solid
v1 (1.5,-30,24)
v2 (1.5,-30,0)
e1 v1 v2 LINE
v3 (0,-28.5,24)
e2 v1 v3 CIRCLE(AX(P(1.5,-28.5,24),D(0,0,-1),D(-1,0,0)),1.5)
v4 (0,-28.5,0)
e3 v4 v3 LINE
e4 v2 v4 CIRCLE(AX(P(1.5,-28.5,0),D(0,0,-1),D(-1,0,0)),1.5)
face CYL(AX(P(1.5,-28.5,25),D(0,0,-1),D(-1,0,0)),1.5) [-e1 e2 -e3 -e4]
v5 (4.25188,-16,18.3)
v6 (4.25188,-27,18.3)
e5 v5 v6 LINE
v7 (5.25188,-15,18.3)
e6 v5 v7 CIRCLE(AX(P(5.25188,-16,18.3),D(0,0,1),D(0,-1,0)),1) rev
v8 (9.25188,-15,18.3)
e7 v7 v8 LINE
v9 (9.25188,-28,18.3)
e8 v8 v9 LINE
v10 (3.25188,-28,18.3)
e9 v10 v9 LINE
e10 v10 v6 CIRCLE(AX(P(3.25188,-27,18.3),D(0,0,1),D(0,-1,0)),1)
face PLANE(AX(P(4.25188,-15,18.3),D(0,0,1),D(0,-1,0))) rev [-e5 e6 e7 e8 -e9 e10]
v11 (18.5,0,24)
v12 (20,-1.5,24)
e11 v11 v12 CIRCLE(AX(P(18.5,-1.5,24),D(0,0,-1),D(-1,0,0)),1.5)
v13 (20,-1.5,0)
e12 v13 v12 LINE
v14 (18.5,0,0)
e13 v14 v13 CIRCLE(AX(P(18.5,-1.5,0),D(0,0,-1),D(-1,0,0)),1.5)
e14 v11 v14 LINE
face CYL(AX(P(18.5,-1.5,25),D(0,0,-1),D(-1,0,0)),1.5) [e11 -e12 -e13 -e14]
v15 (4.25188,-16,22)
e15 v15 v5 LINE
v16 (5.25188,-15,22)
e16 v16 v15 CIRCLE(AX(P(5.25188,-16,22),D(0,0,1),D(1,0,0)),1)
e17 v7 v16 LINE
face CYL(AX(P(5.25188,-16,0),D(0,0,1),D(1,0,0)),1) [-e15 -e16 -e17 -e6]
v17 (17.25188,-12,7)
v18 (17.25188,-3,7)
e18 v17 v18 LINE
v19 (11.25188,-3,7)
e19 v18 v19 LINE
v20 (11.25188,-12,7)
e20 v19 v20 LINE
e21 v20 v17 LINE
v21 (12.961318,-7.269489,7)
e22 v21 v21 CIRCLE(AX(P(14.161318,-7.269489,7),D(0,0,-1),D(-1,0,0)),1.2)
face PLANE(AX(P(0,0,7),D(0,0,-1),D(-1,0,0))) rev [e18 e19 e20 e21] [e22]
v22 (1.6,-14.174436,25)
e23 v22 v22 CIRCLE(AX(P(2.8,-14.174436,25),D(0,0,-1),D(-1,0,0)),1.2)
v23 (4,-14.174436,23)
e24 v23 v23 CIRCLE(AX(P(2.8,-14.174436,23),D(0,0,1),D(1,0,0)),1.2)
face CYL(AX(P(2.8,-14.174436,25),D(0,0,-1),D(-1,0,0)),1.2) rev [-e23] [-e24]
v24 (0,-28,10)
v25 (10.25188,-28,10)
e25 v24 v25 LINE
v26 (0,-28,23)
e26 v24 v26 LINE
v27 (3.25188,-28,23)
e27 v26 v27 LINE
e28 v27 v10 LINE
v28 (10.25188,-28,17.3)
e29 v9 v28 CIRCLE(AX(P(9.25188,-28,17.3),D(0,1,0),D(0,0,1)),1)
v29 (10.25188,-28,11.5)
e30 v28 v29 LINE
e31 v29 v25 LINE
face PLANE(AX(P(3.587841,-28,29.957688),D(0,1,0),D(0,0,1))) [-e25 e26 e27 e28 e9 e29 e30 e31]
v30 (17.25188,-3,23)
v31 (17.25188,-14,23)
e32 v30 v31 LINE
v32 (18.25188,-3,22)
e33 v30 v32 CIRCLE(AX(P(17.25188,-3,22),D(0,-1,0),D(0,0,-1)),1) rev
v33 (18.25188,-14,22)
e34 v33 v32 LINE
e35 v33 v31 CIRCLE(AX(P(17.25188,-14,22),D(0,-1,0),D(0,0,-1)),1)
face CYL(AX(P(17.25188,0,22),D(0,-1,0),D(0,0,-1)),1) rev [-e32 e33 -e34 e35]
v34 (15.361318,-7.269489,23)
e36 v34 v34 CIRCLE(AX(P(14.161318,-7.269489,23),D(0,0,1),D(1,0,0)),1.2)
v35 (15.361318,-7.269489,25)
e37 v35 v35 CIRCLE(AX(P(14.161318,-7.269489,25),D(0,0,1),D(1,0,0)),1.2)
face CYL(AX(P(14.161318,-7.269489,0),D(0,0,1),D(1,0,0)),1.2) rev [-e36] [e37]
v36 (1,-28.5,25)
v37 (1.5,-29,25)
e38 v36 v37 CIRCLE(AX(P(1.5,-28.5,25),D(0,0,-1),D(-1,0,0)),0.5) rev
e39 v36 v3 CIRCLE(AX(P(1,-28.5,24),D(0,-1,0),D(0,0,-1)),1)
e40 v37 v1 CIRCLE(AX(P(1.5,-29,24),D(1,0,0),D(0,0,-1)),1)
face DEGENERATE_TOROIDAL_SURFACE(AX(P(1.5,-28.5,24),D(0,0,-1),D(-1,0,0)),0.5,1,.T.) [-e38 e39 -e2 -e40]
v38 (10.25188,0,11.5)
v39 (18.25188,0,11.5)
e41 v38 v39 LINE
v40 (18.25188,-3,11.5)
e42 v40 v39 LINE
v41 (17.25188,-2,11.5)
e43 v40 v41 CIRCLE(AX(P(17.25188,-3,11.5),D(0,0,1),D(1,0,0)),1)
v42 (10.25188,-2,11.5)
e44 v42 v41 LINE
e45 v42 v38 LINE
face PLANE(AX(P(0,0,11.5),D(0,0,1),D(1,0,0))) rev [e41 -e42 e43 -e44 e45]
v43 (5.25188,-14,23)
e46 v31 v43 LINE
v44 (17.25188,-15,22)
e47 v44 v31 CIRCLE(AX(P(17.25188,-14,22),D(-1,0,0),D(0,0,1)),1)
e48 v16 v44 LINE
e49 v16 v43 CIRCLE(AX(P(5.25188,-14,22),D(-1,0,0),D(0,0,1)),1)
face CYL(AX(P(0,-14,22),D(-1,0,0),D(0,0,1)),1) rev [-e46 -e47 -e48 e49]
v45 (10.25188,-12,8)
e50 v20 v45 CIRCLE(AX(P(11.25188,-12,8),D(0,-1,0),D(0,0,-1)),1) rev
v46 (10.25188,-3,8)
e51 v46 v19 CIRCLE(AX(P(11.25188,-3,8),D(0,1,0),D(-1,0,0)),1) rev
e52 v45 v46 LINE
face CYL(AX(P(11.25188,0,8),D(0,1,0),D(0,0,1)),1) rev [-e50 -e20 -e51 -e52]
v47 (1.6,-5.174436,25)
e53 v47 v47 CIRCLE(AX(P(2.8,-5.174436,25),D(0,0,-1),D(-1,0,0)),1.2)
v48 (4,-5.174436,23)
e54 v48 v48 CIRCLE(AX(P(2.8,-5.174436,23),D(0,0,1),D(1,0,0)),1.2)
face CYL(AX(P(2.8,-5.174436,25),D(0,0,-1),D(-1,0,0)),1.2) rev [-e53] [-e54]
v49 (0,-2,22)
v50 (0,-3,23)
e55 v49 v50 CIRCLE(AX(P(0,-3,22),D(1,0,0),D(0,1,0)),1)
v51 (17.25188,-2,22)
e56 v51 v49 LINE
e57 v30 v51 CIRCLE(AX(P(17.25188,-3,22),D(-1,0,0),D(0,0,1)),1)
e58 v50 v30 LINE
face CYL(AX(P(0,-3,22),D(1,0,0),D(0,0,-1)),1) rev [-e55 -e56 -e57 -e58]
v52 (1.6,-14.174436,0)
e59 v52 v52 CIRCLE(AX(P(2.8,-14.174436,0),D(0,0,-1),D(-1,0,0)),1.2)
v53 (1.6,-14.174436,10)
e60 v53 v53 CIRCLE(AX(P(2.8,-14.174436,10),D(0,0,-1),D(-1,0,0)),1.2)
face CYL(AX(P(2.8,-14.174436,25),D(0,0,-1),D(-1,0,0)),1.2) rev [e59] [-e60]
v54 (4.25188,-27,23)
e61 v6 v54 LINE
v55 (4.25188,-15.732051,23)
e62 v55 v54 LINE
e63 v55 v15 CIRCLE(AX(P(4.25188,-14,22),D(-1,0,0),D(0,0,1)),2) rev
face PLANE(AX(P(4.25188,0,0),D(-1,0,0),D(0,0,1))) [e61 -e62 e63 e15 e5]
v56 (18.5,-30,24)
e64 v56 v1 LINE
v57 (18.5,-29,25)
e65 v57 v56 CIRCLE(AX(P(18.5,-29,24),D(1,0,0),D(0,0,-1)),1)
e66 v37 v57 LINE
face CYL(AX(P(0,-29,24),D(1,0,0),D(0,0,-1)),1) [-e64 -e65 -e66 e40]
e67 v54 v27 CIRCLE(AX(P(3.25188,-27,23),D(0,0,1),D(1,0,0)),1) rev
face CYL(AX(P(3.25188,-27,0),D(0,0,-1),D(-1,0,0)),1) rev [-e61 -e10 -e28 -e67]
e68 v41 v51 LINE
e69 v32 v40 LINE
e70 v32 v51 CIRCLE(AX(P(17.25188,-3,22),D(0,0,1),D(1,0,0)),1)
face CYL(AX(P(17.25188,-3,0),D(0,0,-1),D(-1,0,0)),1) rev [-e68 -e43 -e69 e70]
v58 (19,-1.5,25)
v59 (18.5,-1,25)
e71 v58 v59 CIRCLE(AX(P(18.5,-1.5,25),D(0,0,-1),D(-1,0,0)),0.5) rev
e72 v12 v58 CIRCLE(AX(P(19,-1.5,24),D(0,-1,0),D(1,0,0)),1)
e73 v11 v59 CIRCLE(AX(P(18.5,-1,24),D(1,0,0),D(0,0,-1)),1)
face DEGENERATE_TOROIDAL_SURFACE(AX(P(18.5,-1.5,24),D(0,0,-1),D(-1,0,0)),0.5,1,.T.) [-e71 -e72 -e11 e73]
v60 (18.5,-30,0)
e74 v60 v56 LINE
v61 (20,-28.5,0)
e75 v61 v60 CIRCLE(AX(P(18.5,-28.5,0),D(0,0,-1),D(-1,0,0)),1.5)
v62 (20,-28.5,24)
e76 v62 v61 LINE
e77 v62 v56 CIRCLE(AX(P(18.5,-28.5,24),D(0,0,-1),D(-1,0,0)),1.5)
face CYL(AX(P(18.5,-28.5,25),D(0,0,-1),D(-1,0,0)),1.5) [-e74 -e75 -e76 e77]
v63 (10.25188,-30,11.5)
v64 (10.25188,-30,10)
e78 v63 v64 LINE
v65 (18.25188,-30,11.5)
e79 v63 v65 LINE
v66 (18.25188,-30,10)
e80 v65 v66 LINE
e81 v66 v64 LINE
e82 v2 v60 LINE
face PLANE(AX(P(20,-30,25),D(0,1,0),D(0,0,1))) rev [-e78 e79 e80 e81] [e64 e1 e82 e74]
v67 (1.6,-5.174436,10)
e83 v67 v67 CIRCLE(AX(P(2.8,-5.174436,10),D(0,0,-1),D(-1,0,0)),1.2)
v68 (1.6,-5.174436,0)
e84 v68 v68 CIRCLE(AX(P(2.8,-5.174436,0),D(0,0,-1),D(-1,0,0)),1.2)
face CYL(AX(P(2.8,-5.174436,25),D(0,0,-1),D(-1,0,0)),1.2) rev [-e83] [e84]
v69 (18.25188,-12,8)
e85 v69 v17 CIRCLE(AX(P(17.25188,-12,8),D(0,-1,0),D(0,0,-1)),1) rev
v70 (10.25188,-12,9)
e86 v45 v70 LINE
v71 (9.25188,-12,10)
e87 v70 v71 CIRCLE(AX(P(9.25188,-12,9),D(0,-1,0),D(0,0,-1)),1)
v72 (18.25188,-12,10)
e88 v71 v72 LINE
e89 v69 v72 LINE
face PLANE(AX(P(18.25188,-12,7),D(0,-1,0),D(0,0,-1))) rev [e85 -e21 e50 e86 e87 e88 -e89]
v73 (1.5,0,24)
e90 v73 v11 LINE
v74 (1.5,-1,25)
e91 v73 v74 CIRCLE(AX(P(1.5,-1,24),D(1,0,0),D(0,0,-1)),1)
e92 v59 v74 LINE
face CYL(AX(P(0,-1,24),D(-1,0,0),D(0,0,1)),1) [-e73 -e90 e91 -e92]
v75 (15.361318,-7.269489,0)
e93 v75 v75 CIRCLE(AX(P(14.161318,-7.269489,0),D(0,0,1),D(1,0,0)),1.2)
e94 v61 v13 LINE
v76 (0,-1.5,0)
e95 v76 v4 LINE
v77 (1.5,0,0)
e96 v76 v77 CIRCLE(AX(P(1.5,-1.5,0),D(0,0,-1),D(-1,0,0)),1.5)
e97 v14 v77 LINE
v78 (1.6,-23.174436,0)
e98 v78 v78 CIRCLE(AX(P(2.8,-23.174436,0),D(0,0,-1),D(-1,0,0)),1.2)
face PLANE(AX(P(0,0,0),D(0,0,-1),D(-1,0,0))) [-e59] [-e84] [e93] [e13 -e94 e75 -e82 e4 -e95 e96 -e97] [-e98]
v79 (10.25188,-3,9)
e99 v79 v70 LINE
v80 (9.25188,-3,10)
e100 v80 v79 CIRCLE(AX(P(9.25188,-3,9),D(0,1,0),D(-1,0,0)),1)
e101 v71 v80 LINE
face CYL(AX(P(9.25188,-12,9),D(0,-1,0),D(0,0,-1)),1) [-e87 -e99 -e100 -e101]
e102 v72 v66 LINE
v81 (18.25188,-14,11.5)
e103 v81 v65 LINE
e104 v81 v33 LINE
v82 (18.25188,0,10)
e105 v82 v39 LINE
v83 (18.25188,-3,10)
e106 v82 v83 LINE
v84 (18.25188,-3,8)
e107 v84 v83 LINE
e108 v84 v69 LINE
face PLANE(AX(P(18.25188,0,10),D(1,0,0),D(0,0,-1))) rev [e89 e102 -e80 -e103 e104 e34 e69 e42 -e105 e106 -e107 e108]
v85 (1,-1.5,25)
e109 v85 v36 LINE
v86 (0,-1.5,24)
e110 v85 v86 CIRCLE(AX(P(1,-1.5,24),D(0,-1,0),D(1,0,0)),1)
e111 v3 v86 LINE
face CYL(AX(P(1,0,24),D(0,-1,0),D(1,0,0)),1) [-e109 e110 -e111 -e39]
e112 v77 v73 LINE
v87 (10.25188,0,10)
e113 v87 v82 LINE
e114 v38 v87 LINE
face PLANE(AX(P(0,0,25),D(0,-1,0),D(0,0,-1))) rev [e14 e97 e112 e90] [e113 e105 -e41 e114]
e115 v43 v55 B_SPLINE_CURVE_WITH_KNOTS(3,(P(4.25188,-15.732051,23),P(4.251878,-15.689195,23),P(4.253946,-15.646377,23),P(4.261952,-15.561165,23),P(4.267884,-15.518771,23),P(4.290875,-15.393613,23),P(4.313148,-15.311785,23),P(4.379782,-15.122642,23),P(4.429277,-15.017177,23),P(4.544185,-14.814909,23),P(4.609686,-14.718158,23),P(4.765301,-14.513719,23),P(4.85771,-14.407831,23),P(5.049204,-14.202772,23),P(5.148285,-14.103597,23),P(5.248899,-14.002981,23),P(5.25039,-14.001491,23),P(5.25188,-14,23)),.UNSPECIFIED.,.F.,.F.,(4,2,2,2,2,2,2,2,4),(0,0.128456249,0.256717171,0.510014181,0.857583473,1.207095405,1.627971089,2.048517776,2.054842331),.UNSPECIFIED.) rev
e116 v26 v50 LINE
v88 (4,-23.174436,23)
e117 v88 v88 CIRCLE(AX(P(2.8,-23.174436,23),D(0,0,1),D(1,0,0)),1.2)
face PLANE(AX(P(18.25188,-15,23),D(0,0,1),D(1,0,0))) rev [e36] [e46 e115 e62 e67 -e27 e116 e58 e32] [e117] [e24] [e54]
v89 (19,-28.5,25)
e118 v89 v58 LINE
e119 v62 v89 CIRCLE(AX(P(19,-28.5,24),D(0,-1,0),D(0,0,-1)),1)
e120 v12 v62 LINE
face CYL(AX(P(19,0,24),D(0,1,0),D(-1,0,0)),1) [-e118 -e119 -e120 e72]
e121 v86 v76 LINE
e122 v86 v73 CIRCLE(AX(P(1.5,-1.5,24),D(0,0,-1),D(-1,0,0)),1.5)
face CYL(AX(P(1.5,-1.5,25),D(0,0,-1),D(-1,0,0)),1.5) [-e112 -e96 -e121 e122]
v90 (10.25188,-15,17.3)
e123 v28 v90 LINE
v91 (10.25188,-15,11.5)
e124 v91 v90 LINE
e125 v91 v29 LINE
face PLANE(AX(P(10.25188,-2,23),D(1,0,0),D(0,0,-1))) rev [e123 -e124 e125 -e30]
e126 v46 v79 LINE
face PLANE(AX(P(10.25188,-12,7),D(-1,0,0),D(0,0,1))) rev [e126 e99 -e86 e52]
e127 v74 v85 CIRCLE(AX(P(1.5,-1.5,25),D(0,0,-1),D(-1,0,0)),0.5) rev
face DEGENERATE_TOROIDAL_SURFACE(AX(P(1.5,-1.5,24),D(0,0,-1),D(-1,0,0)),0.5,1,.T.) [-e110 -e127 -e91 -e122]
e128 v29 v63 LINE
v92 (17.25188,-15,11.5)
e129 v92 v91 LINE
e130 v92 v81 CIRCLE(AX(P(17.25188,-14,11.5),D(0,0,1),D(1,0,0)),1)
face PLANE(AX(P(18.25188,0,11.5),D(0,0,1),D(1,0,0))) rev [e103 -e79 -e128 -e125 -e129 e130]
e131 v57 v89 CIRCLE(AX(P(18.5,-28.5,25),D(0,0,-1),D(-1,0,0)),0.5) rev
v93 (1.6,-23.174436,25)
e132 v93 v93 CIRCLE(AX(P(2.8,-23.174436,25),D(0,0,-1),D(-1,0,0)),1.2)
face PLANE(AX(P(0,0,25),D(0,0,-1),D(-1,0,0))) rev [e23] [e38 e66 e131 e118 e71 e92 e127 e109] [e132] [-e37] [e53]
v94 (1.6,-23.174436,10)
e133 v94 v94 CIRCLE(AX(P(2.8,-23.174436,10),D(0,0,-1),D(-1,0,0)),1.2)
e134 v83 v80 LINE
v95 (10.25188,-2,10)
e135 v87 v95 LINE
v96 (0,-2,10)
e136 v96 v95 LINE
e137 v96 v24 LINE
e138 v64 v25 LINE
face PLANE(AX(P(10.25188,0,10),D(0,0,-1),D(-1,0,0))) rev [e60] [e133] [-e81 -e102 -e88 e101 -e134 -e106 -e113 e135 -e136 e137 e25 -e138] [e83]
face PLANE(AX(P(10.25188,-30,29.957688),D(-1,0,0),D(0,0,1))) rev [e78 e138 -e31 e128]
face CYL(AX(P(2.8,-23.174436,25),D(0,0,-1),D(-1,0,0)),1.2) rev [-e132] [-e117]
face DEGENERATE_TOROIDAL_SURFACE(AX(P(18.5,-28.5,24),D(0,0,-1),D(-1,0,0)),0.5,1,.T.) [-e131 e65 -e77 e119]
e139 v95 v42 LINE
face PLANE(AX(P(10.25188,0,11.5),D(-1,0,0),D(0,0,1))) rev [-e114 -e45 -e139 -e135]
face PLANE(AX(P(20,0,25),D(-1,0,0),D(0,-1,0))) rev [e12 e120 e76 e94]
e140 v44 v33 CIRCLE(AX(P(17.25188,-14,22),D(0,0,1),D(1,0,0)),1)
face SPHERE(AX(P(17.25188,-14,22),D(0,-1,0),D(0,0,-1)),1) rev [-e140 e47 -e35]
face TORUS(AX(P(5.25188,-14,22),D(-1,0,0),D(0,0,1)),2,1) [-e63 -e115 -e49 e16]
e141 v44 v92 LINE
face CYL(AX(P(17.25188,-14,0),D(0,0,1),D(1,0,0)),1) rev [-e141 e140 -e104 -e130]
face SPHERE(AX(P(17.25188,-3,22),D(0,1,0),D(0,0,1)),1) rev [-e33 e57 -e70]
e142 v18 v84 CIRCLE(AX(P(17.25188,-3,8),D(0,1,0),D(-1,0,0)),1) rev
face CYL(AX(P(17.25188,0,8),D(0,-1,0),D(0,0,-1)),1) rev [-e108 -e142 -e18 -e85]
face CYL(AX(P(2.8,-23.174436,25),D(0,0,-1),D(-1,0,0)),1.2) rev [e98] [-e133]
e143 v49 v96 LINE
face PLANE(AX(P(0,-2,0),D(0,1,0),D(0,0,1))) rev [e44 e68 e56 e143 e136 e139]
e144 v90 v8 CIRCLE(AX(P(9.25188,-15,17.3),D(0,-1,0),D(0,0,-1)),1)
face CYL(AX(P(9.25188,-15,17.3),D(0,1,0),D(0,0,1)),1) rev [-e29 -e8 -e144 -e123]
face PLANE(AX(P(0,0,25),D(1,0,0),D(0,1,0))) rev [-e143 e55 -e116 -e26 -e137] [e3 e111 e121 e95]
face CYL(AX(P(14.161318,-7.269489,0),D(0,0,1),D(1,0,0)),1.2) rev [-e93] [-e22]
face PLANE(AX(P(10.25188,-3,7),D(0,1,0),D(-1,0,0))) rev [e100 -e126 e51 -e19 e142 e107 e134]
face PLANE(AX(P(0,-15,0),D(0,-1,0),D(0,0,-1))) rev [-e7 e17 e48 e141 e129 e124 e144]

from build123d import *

# Parameters (mm, degrees)
SKETCH1_W               = 20
SKETCH1_H               = 30
BOSS_EXTRUDE1_DEPTH     = 25
CUT_EXTRUDE2_DEPTH      = 44.874821937
CUT_EXTRUDE2_DEPTH_BACK = 44.874821937
SKETCH4_W               = 8
SKETCH4_H               = 1.5
SKETCH5_W               = 8
SKETCH5_H               = 11.5
CUT_EXTRUDE3_DEPTH      = 15
SKETCH6_W               = 6.664038992
SKETCH6_H               = 13
CUT_EXTRUDE4_DEPTH      = 28
SKETCH7_W               = 8
SKETCH7_H               = 9
CUT_EXTRUDE5_DEPTH      = 3
SKETCH11_W              = 6.664038992
SKETCH11_H              = 2
BOSS_EXTRUDE2_DEPTH     = 13
SKETCH12_W              = 8
SKETCH12_H              = 2
BOSS_EXTRUDE3_DEPTH     = 11.5
SKETCH13_W              = 13
SKETCH13_H              = 26
CUT_EXTRUDE7_DEPTH      = 4
SKETCH18_R              = 1.2
CUT_EXTRUDE8_DEPTH      = 44.874821937
LPATTERN1_COUNT         = 3
LPATTERN1_PITCH         = 9
SKETCH19_W              = 4.7
SKETCH19_H              = 13
BOSS_EXTRUDE5_DEPTH     = 6
FILLET1_R               = 1.5
FILLET2_R               = 1
FILLET3_R               = 1
FILLET4_R               = 1
FILLET5_R               = 1
FILLET6_R               = 1
FILLET7_R               = 1
FILLET8_R               = 1
FILLET9_R               = 1
FILLET11_R              = 1
SKETCH20_R              = 1.2
CUT_EXTRUDE9_DEPTH      = 44.874821937


with BuildPart() as part:
    # Sketch1 → Boss-Extrude1 (new body)
    with BuildSketch(Plane.XY):
        with Locations((10, -15)):
            Rectangle(SKETCH1_W, SKETCH1_H)
    extrude(amount=BOSS_EXTRUDE1_DEPTH)

    # Sketch4 → Cut-Extrude2 (cut, two sides: drawn at the far end of the back side and taken through both)
    with BuildSketch(Plane.XZ.offset(30).offset(-CUT_EXTRUDE2_DEPTH_BACK)):
        with Locations((14.251880329, 10.75)):
            Rectangle(SKETCH4_W, SKETCH4_H)
    extrude(amount=CUT_EXTRUDE2_DEPTH + CUT_EXTRUDE2_DEPTH_BACK, mode=Mode.SUBTRACT)

    # Sketch5 → Cut-Extrude3 (cut)
    with BuildSketch(Plane(origin=(0, 0, 0), x_dir=(1, 0, 0), z_dir=(0, 1, 0))):
        with Locations((14.251880329, -17.25)):
            Rectangle(SKETCH5_W, SKETCH5_H)
    extrude(amount=-CUT_EXTRUDE3_DEPTH, mode=Mode.SUBTRACT)

    # Sketch6 → Cut-Extrude4 (cut)
    with BuildSketch(Plane.XZ.offset(30)):
        with Locations((6.919860833, 16.5)):
            Rectangle(SKETCH6_W, SKETCH6_H)
    extrude(amount=-CUT_EXTRUDE4_DEPTH, mode=Mode.SUBTRACT)

    # Sketch7 → Cut-Extrude5 (cut)
    with BuildSketch(Plane.XY.offset(10)):
        with Locations((14.251880329, -7.5)):
            Rectangle(SKETCH7_W, SKETCH7_H)
    extrude(amount=-CUT_EXTRUDE5_DEPTH, mode=Mode.SUBTRACT)

    # Sketch11 → Boss-Extrude2 (add)
    with BuildSketch(Plane.XY.offset(10)):
        with Locations((6.919860833, -29)):
            Rectangle(SKETCH11_W, SKETCH11_H)
    extrude(amount=BOSS_EXTRUDE2_DEPTH)

    # Sketch12 → Boss-Extrude3 (add)
    with BuildSketch(Plane(origin=(0, 0, 23), x_dir=(-1, 0, 0), z_dir=(0, 0, -1))):
        with Locations((-14.251880329, -1)):
            Rectangle(SKETCH12_W, SKETCH12_H)
    extrude(amount=BOSS_EXTRUDE3_DEPTH)

    # Sketch13 → Cut-Extrude7 (cut)
    with BuildSketch(Plane.ZY):
        with Locations((16.5, -15)):
            Rectangle(SKETCH13_W, SKETCH13_H)
    extrude(amount=-CUT_EXTRUDE7_DEPTH, mode=Mode.SUBTRACT)

    # Sketch18 → Cut-Extrude8 (cut, symmetric)
    with BuildSketch(Plane(origin=(0, 0, 0), x_dir=(-1, 0, 0), z_dir=(0, 0, -1))):
        with Locations((-2.8, -23.174436274)):
            Circle(SKETCH18_R)
    cut_extrude8 = extrude(amount=CUT_EXTRUDE8_DEPTH, both=True, mode=Mode.SUBTRACT)

    # LPattern1: Cut-Extrude8 ×3
    with Locations(*[(0, i * LPATTERN1_PITCH, 0) for i in range(1, LPATTERN1_COUNT)]):
        add(cut_extrude8, mode=Mode.SUBTRACT)

    # Sketch19 → Boss-Extrude5 (add)
    with BuildSketch(Plane.ZY.offset(-10.251880329)):
        with Locations((20.65, -21.5)):
            Rectangle(SKETCH19_W, SKETCH19_H)
    extrude(amount=BOSS_EXTRUDE5_DEPTH)

    # Fillet1
    fillet1_edges = [part.edges().sort_by_distance(p)[0] for p in [
        (20, 0, 12.5),
        (20, -30, 12.5),
        (0, -30, 12.5),
        (0, 0, 12.5),
    ]]
    fillet(fillet1_edges, radius=FILLET1_R)

    # Fillet2
    fillet2_edges = [part.edges().sort_by_distance(p)[0] for p in [
        (10.251880329, -21.5, 18.3),
    ]]
    fillet(fillet2_edges, radius=FILLET2_R)

    # Fillet3
    fillet3_edges = [part.edges().sort_by_distance(p)[0] for p in [
        (10.251880329, -7.5, 10),
    ]]
    fillet(fillet3_edges, radius=FILLET3_R)

    # Fillet4
    fillet4_edges = [part.edges().sort_by_distance(p)[0] for p in [
        (18.251880329, -8.5, 23),
    ]]
    fillet(fillet4_edges, radius=FILLET4_R)

    # Fillet5
    fillet5_edges = [part.edges().sort_by_distance(p)[0] for p in [
        (10, 0, 25),
        (20, -15, 25),
        (0, -15, 25),
        (10, -30, 25),
        (0.439339828, -29.560660172, 25),
        (19.560660172, -29.560660172, 25),
        (0.439339828, -0.439339828, 25),
        (19.560660172, -0.439339828, 25),
    ]]
    fillet(fillet5_edges, radius=FILLET5_R)

    # Fillet6
    fillet6_edges = [part.edges().sort_by_distance(p)[0] for p in [
        (18.251880329, -7.5, 7),
        (10.251880329, -7.5, 7),
    ]]
    fillet(fillet6_edges, radius=FILLET6_R)

    # Fillet7
    fillet7_edges = [part.edges().sort_by_distance(p)[0] for p in [
        (18.251880329, -15, 16.75),
        (17.95898711, -15, 22.707106781),
        (10.751880329, -15, 23),
    ]]
    fillet(fillet7_edges, radius=FILLET7_R)

    # Fillet8
    fillet8_edges = [part.edges().sort_by_distance(p)[0] for p in [
        (8.625940164, -2, 23),
        (17.95898711, -2, 22.707106781),
        (18.251880329, -2, 16.75),
    ]]
    fillet(fillet8_edges, radius=FILLET8_R)

    # Fillet9
    # the kernel refuses this fillet: 1 mm, written as the material it takes off along each edge
    with BuildSketch(Plane(origin=(4.251880329, -15, 22), x_dir=(0, -1, 0), z_dir=(0, 0, -1))) as fillet9_piece_1:
        with BuildLine():
            CenterArc((FILLET9_R, -FILLET9_R), FILLET9_R, 90, 90)
            Line((0, -FILLET9_R), (0, 0))
            Line((0, 0), (FILLET9_R, 0))
        make_face()
    extrude(amount=6.2, mode=Mode.SUBTRACT)
    with BuildSketch(Plane(origin=(4.251880329, -14, 22), x_dir=(0, 0.5976672776328242, -0.8017442392976507), z_dir=(0, -0.8017442392976507, -0.5976672776328242))) as fillet9_piece_2_section:
        with BuildLine():
            CenterArc((1 + FILLET9_R, FILLET9_R), FILLET9_R, 180, 90)
            Line((1 + FILLET9_R, 0), (1, 0))
            Line((1, 0), (1, FILLET9_R))
        make_face()
    fillet9_piece_2 = revolve(axis=Axis((4.251880329, -14, 22), (1, 0, 0)), revolution_arc=233.296989237, mode=Mode.PRIVATE)
    fillet9_piece_2 = split(fillet9_piece_2, bisect_by=Plane(origin=(4.563508846, -14.749938848, 23), z_dir=(0, 0, -1)), keep=Keep.TOP, mode=Mode.PRIVATE)
    add(fillet9_piece_2, mode=Mode.SUBTRACT)

    # Fillet11
    fillet11_edges = [part.edges().sort_by_distance(p)[0] for p in [
        (4.251880329, -28, 20.65),
    ]]
    fillet(fillet11_edges, radius=FILLET11_R)

    # Sketch20 → Cut-Extrude9 (cut, through all)
    with BuildSketch(Plane.XY.offset(25)):
        with Locations((14.161317573, -7.269489093)):
            Circle(SKETCH20_R)
    extrude(amount=-CUT_EXTRUDE9_DEPTH, mode=Mode.SUBTRACT)


solid = part.part
